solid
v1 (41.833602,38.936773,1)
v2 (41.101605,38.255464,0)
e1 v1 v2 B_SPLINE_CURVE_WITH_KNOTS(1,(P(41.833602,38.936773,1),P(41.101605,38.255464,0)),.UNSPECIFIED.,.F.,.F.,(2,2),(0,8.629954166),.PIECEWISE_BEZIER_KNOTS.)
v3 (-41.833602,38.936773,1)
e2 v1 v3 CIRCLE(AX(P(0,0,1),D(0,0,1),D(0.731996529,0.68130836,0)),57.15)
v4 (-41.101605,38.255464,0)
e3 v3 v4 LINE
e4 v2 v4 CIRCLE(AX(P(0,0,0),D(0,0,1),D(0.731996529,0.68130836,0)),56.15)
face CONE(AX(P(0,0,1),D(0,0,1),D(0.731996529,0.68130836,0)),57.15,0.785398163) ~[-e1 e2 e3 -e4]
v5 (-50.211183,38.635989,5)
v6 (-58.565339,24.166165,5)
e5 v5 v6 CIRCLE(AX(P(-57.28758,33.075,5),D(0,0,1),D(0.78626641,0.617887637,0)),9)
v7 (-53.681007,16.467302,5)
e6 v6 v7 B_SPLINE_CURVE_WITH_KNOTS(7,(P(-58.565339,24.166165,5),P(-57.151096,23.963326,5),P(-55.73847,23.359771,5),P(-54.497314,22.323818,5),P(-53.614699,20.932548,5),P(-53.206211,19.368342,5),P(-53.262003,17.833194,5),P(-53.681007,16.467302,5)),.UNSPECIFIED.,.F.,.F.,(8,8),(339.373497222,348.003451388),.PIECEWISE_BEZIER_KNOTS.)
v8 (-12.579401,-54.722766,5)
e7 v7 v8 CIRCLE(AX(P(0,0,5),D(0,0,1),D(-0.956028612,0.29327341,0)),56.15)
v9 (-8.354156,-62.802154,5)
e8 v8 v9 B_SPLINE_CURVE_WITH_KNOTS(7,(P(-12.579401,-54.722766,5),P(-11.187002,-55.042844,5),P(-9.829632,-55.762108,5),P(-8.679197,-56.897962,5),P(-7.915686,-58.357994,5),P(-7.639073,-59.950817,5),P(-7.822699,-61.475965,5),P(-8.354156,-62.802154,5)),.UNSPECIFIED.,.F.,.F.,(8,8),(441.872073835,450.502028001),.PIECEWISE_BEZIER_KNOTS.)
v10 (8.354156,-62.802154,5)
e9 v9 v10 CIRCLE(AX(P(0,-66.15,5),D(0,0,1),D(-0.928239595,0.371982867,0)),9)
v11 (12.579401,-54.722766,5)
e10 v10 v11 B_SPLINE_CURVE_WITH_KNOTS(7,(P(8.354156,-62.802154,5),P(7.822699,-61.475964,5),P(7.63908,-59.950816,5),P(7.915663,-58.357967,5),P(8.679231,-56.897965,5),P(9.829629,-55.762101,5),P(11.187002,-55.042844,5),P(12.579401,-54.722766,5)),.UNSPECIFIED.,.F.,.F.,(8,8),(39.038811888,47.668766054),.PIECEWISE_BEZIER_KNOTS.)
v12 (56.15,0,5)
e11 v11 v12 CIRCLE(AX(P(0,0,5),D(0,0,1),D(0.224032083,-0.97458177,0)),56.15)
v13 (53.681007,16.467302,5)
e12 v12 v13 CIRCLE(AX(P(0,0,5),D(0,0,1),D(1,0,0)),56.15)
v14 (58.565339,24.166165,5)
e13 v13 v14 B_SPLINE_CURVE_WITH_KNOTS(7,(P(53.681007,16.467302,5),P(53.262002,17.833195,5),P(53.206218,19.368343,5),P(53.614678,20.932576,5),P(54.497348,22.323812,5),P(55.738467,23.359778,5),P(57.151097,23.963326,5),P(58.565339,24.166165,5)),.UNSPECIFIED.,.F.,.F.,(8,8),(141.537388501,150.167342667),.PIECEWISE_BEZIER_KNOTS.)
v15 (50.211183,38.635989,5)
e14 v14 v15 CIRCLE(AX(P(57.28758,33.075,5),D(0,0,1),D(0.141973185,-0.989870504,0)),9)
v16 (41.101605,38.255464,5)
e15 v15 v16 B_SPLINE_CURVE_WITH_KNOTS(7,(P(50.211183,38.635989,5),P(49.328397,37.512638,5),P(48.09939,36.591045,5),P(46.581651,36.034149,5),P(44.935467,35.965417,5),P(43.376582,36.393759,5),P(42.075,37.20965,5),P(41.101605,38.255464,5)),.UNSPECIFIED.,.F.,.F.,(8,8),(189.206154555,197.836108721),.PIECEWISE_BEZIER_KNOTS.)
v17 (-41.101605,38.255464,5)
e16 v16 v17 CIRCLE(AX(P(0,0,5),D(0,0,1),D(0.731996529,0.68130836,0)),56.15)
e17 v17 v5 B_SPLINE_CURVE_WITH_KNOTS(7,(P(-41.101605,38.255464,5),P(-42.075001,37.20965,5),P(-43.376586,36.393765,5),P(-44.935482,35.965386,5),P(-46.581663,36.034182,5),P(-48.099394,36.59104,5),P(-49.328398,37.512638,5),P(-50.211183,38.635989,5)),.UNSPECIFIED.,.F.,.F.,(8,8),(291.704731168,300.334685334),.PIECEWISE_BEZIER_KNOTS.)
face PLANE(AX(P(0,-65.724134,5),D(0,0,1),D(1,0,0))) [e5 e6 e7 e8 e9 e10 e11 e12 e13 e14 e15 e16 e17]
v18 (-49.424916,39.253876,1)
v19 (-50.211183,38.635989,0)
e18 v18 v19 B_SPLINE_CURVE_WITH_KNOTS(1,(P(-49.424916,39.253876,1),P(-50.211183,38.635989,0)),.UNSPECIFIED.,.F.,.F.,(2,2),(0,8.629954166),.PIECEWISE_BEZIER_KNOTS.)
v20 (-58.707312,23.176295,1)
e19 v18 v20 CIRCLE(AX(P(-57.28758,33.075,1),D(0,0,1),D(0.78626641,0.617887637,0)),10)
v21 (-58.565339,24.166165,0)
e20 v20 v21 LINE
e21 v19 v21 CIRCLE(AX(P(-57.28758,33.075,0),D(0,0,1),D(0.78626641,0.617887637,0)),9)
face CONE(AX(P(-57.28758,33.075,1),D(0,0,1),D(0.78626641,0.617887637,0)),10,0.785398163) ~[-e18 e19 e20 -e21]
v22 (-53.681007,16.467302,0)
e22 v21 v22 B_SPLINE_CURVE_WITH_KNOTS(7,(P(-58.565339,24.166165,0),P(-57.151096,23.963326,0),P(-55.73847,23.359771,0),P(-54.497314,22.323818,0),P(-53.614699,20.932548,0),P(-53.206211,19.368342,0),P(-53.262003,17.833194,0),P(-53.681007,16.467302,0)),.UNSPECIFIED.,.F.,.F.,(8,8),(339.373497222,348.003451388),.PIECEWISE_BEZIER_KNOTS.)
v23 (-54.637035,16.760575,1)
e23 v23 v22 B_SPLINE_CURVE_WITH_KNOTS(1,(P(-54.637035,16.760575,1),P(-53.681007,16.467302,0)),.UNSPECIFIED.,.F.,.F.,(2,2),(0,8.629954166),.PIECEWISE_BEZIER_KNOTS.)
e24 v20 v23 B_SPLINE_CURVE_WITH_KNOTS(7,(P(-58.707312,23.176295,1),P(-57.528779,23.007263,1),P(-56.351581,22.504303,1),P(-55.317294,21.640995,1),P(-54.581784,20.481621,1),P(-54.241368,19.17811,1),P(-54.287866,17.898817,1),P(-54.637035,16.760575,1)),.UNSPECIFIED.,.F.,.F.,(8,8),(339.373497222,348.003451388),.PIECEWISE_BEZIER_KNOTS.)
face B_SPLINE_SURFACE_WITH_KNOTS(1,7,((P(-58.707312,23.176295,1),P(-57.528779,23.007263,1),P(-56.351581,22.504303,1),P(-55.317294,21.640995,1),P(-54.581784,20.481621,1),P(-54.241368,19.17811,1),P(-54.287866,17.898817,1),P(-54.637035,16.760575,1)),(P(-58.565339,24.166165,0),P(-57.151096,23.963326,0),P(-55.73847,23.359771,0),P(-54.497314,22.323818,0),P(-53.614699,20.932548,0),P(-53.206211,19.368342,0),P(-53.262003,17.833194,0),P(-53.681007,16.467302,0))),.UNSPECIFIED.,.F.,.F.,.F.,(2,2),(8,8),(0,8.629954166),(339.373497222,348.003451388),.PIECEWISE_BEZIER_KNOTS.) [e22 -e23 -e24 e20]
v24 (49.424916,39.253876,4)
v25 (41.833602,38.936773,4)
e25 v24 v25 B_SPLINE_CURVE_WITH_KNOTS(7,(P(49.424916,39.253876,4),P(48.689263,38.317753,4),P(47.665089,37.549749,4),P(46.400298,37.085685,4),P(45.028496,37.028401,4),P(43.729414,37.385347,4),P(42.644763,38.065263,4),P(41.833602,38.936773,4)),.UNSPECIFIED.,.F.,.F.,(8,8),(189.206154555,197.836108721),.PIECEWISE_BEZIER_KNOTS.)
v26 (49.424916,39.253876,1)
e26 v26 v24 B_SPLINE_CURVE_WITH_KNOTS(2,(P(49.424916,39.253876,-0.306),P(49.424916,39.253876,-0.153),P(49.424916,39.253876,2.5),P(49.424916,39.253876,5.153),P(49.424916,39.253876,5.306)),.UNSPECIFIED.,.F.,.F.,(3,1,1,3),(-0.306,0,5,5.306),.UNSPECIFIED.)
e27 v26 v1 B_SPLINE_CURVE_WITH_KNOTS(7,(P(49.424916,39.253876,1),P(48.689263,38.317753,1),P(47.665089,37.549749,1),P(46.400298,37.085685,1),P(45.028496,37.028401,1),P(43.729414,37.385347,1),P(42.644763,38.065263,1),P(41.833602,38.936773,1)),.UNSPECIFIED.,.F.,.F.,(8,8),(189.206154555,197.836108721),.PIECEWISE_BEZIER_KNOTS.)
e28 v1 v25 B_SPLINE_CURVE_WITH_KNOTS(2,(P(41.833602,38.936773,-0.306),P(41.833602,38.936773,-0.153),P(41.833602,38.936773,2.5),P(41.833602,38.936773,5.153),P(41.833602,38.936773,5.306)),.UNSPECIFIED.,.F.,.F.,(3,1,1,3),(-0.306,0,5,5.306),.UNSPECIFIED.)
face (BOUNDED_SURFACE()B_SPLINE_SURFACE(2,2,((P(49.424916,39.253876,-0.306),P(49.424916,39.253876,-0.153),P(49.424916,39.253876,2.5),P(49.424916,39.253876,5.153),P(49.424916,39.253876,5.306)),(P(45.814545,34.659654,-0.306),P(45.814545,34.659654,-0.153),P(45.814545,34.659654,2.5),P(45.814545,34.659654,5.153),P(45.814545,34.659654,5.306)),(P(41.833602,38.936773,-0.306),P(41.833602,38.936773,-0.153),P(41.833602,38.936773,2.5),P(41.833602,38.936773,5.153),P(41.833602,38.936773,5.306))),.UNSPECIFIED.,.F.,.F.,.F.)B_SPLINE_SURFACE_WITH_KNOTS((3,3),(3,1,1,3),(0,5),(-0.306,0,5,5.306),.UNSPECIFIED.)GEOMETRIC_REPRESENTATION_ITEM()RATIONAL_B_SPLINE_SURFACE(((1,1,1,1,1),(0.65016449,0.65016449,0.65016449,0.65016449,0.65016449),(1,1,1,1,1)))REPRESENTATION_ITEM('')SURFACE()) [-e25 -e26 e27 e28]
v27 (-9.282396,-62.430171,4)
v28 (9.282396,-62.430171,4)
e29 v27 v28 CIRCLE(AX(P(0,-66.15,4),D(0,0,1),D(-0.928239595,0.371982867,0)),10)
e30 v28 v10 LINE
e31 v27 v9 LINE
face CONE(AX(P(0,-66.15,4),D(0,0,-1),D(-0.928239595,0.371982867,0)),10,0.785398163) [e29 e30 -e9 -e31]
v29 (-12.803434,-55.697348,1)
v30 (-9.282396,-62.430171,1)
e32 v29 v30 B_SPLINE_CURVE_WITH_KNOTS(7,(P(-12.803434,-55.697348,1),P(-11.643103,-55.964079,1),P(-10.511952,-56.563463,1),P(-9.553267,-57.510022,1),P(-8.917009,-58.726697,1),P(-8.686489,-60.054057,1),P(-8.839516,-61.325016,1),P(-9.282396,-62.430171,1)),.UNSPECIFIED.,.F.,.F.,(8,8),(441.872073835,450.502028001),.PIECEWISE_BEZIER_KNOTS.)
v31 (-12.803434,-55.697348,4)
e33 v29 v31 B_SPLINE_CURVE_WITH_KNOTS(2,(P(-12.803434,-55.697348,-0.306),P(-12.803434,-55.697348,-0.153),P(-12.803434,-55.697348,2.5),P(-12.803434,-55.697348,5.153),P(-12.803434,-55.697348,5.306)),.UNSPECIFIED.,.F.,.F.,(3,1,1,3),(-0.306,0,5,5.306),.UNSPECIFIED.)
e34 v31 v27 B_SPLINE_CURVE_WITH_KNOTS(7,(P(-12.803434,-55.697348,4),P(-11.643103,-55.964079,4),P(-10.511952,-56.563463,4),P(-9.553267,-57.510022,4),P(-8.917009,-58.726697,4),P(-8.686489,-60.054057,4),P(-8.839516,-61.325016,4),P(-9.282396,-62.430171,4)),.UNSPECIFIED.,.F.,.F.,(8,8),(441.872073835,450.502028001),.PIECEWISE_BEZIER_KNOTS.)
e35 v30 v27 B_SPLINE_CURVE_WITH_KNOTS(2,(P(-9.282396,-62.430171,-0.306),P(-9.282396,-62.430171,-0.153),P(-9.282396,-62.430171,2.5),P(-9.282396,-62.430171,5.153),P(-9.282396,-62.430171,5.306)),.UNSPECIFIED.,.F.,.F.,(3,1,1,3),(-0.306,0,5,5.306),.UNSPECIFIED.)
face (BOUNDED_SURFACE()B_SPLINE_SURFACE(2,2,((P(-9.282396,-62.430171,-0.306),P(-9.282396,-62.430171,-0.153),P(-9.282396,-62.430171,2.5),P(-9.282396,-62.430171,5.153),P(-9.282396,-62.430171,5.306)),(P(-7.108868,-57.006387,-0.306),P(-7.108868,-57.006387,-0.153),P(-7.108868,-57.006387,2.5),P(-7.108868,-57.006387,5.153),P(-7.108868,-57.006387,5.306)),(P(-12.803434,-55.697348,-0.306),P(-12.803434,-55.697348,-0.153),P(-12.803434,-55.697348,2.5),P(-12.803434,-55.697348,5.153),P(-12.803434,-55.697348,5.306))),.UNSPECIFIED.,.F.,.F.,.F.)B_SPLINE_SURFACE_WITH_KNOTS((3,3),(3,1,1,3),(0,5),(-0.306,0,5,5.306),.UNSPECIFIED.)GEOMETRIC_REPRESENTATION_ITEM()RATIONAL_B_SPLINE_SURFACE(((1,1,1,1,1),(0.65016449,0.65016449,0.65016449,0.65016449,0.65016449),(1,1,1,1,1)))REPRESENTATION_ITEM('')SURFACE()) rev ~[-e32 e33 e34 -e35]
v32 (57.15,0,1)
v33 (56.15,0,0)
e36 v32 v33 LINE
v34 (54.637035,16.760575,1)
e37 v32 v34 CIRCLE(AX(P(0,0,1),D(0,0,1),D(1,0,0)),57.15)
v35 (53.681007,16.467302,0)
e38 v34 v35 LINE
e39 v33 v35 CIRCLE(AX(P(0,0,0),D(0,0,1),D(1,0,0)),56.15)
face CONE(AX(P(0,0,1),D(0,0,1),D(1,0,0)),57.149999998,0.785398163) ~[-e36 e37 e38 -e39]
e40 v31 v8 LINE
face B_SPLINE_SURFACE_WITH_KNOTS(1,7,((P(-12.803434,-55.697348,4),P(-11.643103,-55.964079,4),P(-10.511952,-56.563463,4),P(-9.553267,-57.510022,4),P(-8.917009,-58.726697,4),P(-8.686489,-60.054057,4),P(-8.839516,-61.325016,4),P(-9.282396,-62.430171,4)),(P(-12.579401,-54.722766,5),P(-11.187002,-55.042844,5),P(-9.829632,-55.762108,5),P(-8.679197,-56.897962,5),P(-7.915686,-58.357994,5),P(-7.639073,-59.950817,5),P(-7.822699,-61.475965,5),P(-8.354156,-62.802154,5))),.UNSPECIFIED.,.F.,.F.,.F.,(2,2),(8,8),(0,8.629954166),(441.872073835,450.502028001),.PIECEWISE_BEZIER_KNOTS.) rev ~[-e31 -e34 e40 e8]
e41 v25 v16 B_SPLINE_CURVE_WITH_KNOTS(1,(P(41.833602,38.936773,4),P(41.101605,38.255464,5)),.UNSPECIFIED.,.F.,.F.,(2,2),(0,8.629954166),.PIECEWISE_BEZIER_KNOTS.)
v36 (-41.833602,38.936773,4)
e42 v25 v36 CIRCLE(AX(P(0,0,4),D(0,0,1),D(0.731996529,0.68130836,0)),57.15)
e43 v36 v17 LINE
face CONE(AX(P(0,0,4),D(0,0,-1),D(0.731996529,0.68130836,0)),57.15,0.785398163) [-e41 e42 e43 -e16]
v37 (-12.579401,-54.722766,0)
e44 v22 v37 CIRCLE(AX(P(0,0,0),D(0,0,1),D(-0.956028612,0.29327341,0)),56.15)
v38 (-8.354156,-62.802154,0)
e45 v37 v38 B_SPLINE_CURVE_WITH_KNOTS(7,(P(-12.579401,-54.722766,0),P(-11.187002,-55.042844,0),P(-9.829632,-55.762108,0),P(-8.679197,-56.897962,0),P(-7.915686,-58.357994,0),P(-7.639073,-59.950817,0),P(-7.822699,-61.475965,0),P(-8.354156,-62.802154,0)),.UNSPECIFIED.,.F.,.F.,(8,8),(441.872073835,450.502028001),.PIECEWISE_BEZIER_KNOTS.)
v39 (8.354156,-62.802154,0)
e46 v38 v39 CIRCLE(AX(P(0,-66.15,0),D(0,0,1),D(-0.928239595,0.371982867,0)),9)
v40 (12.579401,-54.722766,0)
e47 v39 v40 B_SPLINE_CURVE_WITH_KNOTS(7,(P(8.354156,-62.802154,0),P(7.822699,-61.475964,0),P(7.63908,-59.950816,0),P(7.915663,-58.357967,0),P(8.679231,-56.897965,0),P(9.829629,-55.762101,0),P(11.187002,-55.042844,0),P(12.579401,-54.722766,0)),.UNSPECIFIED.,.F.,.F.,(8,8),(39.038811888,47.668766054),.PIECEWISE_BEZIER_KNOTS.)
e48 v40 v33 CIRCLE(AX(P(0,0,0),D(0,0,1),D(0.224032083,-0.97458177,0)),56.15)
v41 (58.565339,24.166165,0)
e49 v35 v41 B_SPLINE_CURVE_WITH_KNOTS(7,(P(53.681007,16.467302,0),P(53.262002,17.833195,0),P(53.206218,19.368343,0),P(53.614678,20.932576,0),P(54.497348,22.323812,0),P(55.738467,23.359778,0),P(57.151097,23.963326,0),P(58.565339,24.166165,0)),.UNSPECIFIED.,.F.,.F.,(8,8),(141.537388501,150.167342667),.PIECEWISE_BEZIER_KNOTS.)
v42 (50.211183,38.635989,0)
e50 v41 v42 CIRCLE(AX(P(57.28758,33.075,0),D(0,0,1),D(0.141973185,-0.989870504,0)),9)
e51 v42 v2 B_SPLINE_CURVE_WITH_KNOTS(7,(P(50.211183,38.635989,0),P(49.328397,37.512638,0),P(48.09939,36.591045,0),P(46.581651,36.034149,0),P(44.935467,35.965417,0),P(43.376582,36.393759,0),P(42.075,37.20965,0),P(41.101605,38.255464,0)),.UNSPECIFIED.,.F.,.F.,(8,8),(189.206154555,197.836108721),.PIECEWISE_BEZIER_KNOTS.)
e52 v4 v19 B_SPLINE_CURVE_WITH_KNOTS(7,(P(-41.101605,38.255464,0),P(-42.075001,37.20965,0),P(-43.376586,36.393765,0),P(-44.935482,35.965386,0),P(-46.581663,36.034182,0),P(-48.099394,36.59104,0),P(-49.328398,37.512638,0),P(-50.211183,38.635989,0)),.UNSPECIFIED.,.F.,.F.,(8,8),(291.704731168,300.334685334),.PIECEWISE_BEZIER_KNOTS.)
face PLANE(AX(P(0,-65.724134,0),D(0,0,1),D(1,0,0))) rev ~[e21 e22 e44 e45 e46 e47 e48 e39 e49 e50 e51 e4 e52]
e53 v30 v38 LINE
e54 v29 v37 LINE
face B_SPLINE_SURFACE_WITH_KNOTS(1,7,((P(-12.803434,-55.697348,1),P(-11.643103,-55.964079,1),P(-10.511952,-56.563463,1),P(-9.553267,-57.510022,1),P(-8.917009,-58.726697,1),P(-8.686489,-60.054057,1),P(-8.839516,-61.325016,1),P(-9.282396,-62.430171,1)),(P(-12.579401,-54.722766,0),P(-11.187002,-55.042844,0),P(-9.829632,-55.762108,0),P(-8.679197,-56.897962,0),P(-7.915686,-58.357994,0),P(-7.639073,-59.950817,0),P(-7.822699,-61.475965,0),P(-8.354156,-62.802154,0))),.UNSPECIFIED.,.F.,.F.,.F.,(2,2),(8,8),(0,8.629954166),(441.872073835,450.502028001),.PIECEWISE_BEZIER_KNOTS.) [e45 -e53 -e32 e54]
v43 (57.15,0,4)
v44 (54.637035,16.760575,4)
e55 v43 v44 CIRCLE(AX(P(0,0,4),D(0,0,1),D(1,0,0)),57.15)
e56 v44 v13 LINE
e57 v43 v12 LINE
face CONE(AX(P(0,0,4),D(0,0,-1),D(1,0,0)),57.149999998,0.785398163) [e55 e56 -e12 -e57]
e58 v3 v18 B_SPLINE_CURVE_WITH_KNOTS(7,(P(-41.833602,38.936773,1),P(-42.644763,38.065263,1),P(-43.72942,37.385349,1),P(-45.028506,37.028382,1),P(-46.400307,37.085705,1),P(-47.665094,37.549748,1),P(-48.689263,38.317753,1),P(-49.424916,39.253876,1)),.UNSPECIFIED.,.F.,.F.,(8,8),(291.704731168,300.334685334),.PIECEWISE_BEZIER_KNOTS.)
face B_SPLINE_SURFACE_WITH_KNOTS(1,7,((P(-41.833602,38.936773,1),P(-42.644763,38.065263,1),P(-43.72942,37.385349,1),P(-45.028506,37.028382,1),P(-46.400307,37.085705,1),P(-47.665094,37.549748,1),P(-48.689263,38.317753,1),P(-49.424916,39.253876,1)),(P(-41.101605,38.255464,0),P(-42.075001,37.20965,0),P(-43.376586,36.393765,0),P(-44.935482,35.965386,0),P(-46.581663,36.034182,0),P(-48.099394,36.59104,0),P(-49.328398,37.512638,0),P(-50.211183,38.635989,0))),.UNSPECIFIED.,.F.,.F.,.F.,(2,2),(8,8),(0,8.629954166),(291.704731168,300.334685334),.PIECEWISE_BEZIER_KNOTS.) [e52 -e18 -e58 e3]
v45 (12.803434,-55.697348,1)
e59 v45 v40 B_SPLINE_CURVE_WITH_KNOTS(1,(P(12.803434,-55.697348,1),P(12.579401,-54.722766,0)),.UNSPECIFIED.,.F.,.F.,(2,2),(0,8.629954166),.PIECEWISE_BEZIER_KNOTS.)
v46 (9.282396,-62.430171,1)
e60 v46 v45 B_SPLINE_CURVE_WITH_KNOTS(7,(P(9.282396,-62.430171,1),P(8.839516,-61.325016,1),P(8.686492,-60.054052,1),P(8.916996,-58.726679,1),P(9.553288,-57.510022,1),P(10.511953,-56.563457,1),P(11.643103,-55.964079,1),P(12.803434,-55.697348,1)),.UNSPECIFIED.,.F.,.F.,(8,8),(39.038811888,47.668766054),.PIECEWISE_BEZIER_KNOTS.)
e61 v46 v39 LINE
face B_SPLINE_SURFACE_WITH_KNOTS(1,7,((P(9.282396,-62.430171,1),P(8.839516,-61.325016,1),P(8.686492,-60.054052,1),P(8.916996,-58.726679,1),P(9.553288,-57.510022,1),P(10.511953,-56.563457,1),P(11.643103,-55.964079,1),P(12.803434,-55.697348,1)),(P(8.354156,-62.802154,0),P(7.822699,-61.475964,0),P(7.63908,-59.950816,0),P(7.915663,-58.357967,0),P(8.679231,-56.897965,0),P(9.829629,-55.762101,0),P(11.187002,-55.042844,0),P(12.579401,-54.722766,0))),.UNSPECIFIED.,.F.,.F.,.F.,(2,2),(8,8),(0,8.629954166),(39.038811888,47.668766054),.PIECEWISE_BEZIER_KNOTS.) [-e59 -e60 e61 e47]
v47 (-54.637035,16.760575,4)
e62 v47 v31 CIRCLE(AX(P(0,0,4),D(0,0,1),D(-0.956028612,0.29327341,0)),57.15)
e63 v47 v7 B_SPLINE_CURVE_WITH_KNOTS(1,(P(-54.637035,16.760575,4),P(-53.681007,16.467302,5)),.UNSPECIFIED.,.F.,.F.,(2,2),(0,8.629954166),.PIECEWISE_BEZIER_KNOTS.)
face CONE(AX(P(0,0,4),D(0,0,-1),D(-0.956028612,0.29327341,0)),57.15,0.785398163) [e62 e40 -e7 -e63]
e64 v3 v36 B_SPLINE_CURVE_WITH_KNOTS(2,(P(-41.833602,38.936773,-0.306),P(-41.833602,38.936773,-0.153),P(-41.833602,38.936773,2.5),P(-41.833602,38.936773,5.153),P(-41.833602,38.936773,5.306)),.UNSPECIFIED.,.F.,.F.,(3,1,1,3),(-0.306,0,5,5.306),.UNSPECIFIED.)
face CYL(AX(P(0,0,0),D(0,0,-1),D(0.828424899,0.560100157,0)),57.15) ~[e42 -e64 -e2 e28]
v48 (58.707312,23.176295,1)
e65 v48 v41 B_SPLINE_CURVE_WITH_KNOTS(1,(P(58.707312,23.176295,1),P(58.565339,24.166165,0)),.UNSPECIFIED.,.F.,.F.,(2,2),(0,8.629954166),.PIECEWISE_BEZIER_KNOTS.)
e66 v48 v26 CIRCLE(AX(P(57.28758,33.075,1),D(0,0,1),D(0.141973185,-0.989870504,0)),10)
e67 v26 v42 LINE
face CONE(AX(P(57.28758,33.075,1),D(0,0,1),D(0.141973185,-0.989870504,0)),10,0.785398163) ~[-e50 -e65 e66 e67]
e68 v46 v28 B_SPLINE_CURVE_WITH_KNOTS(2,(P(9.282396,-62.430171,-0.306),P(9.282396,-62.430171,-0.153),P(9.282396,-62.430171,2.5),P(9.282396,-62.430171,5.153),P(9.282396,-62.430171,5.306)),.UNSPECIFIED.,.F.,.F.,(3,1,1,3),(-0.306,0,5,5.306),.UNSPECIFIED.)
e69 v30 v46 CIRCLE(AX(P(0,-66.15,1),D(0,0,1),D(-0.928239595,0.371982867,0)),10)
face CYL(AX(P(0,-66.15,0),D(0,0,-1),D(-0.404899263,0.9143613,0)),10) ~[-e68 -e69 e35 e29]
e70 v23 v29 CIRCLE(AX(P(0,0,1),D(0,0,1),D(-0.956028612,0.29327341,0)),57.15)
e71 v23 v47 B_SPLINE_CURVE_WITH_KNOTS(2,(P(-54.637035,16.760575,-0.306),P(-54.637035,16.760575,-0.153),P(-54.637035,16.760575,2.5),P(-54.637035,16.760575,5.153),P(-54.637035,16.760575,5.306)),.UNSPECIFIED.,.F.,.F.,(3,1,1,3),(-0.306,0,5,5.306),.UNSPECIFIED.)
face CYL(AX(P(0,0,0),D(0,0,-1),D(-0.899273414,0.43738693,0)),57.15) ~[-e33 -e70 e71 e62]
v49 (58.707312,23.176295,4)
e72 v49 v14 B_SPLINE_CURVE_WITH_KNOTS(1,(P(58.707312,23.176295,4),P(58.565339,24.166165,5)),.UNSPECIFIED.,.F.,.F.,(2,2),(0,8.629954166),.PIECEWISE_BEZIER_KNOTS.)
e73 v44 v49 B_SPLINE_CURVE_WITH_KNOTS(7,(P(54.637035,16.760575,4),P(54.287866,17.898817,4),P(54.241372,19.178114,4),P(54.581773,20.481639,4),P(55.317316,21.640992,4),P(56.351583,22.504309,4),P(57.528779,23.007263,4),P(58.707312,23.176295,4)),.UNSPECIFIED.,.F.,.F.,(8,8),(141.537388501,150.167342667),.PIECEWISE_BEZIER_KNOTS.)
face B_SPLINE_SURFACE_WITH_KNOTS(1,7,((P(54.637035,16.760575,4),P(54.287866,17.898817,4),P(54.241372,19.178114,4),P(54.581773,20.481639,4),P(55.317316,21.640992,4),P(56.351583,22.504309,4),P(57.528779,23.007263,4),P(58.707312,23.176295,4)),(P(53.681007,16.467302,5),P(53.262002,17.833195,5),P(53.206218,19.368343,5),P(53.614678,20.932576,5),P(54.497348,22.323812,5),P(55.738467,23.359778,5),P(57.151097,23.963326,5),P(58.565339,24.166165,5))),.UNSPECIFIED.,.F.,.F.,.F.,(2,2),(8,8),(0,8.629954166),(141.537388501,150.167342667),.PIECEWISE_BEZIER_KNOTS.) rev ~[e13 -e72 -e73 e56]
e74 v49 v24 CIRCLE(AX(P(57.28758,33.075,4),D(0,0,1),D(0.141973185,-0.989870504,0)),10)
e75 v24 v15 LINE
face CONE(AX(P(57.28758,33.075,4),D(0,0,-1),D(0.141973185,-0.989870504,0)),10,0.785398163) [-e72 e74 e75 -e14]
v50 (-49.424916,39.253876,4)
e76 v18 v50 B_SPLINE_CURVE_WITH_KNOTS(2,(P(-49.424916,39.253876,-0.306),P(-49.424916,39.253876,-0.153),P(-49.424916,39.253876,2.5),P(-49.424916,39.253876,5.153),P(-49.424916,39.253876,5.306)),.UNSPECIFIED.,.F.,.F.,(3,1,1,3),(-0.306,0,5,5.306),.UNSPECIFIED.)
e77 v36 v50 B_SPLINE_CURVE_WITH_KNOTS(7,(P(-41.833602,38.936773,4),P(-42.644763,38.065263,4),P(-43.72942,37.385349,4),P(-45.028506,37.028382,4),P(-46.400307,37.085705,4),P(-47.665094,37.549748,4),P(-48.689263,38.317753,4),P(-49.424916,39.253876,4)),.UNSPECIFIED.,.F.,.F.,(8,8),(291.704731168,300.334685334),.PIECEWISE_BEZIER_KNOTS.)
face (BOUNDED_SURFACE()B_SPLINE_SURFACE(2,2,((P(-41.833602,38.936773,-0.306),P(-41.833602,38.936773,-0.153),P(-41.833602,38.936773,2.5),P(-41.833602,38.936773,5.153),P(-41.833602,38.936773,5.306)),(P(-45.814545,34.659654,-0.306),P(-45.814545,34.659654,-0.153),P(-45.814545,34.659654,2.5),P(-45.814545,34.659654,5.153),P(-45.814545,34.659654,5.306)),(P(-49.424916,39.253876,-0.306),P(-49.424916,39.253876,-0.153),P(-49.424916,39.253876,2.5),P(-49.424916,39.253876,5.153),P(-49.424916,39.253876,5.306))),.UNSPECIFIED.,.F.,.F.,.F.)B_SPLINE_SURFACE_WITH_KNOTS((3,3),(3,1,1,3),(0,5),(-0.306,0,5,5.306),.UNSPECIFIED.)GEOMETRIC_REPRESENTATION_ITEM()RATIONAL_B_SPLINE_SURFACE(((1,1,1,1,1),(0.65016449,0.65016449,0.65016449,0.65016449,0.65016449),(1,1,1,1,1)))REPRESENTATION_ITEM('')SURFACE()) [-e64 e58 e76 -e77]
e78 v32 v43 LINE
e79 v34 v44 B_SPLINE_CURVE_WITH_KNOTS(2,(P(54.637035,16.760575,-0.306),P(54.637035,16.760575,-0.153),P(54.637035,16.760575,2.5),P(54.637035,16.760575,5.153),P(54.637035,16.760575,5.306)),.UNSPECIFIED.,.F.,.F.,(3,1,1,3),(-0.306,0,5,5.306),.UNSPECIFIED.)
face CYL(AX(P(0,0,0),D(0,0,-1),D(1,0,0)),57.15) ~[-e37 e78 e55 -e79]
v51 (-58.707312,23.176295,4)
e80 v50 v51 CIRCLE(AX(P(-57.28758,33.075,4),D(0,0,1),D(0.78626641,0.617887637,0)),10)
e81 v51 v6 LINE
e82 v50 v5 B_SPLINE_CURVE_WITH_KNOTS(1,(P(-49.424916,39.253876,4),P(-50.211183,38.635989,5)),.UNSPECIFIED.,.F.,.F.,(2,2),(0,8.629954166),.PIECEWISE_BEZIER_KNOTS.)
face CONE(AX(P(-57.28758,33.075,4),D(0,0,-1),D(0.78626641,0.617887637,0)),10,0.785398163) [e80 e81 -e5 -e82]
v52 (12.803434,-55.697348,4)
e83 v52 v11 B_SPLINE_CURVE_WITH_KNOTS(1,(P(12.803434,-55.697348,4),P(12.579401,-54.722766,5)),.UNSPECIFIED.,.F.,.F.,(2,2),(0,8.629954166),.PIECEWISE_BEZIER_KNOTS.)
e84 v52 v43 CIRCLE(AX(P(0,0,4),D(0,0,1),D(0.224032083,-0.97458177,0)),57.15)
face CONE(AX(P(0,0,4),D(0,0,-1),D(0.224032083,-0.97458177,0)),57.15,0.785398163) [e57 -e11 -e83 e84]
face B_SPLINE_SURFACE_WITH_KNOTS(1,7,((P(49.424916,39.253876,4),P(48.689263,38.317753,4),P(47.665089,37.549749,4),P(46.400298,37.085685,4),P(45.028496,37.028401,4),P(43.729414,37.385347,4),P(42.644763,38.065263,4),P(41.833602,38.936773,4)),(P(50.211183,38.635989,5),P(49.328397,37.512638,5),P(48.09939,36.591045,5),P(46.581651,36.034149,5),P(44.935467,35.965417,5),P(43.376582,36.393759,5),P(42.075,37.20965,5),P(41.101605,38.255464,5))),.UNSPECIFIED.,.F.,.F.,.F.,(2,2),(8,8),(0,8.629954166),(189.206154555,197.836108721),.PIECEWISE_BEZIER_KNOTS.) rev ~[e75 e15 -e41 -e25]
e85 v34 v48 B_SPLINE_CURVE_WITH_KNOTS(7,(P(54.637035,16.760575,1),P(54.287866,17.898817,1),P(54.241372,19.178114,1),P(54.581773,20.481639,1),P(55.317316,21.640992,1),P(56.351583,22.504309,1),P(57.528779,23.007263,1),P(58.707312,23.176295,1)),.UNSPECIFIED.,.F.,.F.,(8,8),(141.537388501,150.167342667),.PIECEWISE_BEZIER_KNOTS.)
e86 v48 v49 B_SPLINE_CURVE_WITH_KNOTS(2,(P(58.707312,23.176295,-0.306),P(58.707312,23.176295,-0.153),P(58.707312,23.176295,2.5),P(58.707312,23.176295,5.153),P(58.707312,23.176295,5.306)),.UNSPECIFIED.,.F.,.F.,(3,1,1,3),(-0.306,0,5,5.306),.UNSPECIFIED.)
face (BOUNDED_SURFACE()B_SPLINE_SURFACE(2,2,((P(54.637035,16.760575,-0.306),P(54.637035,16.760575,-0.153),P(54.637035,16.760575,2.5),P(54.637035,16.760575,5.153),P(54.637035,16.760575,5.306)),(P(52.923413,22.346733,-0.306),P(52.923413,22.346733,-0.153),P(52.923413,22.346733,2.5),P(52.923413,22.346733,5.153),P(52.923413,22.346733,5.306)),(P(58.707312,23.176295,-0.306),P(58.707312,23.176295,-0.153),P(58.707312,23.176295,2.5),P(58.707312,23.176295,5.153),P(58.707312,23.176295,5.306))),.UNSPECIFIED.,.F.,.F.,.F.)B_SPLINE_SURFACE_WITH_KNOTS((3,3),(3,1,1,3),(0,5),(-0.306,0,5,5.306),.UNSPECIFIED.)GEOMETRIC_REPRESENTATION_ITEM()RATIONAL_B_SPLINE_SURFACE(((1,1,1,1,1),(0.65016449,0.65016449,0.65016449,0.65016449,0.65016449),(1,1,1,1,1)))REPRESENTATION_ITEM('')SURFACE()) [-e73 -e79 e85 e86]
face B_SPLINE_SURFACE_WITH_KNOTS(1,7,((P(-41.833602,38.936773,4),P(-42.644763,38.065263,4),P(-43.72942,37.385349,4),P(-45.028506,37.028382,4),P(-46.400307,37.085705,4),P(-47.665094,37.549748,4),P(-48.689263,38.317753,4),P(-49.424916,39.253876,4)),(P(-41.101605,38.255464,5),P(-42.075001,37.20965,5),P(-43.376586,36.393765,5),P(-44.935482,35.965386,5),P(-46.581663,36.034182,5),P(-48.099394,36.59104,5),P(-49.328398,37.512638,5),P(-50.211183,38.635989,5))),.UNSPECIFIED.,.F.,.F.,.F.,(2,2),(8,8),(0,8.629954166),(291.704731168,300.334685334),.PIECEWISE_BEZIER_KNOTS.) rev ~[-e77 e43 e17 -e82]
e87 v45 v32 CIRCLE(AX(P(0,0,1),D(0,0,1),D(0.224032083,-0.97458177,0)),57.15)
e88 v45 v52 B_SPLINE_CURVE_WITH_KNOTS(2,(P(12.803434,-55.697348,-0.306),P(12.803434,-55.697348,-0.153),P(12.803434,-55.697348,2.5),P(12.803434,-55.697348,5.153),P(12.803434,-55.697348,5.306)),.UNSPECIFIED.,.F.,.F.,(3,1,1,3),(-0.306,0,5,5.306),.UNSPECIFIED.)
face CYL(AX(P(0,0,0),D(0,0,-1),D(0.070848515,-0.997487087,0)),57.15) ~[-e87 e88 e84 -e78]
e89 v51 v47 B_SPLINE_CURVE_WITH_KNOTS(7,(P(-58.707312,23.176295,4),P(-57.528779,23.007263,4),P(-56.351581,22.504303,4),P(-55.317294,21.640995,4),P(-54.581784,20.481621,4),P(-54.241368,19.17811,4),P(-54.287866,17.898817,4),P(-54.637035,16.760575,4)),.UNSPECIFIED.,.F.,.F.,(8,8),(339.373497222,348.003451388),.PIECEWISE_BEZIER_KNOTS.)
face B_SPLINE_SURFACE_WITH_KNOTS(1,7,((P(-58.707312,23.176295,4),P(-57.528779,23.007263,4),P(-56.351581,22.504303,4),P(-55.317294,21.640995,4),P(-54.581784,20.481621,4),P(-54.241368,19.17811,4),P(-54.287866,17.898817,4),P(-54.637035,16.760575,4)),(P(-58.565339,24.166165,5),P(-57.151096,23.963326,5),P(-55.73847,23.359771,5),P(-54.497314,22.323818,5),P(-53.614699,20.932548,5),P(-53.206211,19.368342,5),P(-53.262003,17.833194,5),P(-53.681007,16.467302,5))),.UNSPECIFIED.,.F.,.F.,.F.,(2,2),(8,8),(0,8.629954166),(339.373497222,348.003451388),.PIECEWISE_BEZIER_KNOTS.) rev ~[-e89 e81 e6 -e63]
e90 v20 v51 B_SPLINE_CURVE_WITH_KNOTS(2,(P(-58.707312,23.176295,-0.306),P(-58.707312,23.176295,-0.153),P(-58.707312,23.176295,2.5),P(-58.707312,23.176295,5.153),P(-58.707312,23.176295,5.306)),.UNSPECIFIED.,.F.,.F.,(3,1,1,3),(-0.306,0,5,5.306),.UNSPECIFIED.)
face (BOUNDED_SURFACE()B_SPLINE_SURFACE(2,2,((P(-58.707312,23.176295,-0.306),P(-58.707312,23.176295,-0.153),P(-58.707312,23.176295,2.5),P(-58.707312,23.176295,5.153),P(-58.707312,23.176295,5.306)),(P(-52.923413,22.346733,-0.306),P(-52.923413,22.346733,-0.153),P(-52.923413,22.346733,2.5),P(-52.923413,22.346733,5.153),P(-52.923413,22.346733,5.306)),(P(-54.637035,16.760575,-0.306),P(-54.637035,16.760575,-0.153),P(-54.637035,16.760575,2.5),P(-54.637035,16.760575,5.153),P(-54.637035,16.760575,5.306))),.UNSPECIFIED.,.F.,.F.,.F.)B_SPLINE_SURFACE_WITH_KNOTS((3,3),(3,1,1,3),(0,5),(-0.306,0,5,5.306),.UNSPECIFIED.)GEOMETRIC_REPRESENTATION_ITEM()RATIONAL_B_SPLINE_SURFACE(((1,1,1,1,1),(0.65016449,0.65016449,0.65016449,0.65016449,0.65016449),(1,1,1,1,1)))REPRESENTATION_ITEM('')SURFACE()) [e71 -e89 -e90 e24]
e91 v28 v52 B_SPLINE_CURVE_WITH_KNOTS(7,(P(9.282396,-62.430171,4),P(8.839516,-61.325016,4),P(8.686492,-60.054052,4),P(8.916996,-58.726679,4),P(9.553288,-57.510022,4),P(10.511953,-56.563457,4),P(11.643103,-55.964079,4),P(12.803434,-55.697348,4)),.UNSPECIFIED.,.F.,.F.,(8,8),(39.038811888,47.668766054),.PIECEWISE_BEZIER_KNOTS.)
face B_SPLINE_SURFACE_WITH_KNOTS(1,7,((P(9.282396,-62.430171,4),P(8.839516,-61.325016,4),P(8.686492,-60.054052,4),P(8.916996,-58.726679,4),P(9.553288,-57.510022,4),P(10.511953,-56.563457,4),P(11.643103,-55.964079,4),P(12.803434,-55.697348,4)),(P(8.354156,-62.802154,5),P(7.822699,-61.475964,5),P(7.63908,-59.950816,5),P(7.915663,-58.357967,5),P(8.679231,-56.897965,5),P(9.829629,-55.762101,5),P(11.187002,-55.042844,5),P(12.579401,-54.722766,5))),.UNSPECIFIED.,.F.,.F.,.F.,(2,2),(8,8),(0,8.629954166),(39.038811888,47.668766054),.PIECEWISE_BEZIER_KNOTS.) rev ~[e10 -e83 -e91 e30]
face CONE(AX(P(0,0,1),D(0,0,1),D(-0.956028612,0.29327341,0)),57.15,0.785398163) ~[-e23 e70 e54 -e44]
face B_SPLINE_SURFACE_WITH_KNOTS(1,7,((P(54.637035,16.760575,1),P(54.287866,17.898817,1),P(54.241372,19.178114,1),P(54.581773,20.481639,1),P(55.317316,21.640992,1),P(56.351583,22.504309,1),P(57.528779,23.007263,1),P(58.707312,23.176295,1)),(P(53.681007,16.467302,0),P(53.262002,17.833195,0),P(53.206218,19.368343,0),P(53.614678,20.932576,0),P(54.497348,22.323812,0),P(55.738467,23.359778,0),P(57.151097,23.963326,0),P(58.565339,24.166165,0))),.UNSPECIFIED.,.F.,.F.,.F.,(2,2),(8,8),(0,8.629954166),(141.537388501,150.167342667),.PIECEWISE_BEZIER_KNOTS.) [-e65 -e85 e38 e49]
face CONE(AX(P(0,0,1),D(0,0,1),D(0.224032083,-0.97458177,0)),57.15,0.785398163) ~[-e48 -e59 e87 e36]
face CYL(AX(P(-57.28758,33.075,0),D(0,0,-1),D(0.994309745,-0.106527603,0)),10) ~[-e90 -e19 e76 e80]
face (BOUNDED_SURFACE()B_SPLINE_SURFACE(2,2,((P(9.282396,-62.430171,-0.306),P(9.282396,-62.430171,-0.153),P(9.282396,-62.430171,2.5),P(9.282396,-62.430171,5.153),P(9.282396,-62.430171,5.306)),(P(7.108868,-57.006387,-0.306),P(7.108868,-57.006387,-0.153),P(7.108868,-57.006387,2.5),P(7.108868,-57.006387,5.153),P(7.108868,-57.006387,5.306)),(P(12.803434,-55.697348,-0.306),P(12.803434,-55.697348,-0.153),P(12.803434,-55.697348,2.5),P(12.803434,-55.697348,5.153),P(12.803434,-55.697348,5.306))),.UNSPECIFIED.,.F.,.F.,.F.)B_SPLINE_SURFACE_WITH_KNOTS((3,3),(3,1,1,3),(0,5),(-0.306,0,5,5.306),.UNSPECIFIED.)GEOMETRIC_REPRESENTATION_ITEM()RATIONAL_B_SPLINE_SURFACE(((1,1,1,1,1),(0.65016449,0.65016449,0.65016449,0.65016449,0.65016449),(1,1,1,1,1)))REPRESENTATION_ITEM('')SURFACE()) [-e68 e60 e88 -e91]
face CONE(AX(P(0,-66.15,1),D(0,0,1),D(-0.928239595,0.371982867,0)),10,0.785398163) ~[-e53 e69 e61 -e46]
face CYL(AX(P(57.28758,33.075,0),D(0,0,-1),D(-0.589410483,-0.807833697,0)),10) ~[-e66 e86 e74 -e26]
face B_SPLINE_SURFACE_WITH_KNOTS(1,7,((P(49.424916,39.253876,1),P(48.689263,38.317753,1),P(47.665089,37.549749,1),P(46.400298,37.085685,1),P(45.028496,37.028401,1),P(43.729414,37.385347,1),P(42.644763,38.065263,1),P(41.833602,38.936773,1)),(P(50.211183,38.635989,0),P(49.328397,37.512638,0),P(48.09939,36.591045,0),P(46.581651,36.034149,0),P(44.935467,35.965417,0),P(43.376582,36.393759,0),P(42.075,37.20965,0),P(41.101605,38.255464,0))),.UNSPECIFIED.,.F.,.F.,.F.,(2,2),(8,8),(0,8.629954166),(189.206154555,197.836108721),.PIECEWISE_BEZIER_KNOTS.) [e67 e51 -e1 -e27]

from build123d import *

# Parameters (mm, degrees)
F1_DEPTH = 5
F2_R     = 5
F3_SIZE  = 1


with BuildPart() as f1:
    # F0 (on Top) → F1 (new body)
    with BuildSketch(Plane.XY):
        with BuildLine():
            ThreePointArc((-4.0489926269, -57.0063869992), (0, -76.15), (4.0489926269, -57.0063869992))
            ThreePointArc((4.0489926269, -57.0063869992), (0, -57.15), (-4.0489926269, -57.0063869992))
        make_face()
        with BuildLine():
            ThreePointArc((4.0489926269, -57.0063869992), (41.8181923846, -38.9533218826), (57.15, 0))
            ThreePointArc((57.15, 0), (55.6922778867, 12.8254701198), (51.3934756327, 24.996663025))
            ThreePointArc((51.3934756327, 24.996663025), (49.4933518263, 28.575), (47.3444830059, 32.0097239742))
            ThreePointArc((47.3444830059, 32.0097239742), (0, 57.15), (-47.3444830059, 32.0097239742))
            ThreePointArc((-47.3444830059, 32.0097239742), (-49.4933518263, 28.575), (-51.3934756327, 24.996663025))
            ThreePointArc((-51.3934756327, 24.996663025), (-49.4933518263, -28.575), (-4.0489926269, -57.0063869992))
            ThreePointArc((-4.0489926269, -57.0063869992), (0, -57.15), (4.0489926269, -57.0063869992))
        make_face()
        with BuildLine():
            ThreePointArc((47.3444830059, 32.0097239742), (49.4933518263, 28.575), (51.3934756327, 24.996663025))
            ThreePointArc((51.3934756327, 24.996663025), (65.9478344982, 38.075), (47.3444830059, 32.0097239742))
        make_face()
        with BuildLine():
            ThreePointArc((-51.3934756327, 24.996663025), (-49.4933518263, 28.575), (-47.3444830059, 32.0097239742))
            ThreePointArc((-47.3444830059, 32.0097239742), (-65.9478344982, 38.075), (-51.3934756327, 24.996663025))
        make_face()
    extrude(amount=F1_DEPTH)

    # F2
    f2_edges = [f1.edges().sort_by_distance(p)[0] for p in [
        (-4.048993, -57.006387, 2.5),
        (51.393476, 24.996663, 2.5),
        (-47.344483, 32.009724, 2.5),
        (4.048993, -57.006387, 2.5),
        (47.344483, 32.009724, 2.5),
        (-51.393476, 24.996663, 2.5),
    ]]
    fillet(f2_edges, radius=F2_R)

    # F3
    f3_edges = [f1.edges().sort_by_distance(p)[0] for p in [
        (0, -76.15, 5),
        (-9.492901, -58.253155, 5),
        (9.492901, -58.253155, 5),
        (-49.493352, -28.575, 5),
        (49.493352, -28.575, 5),
        (-55.195163, 20.905484, 5),
        (55.195163, 20.905484, 5),
        (-65.947834, 38.075, 5),
        (65.947834, 38.075, 5),
        (-45.702262, 37.347671, 5),
        (45.702262, 37.347671, 5),
        (0, 57.15, 5),
        (0, -76.15, 0),
        (-9.492901, -58.253155, 0),
        (9.492901, -58.253155, 0),
        (-49.493352, -28.575, 0),
        (49.493352, -28.575, 0),
        (-55.195163, 20.905484, 0),
        (55.195163, 20.905484, 0),
        (-65.947834, 38.075, 0),
        (65.947834, 38.075, 0),
        (-45.702262, 37.347671, 0),
        (45.702262, 37.347671, 0),
        (0, 57.15, 0),
    ]]
    chamfer(f3_edges, length=F3_SIZE)


solid = f1.part
